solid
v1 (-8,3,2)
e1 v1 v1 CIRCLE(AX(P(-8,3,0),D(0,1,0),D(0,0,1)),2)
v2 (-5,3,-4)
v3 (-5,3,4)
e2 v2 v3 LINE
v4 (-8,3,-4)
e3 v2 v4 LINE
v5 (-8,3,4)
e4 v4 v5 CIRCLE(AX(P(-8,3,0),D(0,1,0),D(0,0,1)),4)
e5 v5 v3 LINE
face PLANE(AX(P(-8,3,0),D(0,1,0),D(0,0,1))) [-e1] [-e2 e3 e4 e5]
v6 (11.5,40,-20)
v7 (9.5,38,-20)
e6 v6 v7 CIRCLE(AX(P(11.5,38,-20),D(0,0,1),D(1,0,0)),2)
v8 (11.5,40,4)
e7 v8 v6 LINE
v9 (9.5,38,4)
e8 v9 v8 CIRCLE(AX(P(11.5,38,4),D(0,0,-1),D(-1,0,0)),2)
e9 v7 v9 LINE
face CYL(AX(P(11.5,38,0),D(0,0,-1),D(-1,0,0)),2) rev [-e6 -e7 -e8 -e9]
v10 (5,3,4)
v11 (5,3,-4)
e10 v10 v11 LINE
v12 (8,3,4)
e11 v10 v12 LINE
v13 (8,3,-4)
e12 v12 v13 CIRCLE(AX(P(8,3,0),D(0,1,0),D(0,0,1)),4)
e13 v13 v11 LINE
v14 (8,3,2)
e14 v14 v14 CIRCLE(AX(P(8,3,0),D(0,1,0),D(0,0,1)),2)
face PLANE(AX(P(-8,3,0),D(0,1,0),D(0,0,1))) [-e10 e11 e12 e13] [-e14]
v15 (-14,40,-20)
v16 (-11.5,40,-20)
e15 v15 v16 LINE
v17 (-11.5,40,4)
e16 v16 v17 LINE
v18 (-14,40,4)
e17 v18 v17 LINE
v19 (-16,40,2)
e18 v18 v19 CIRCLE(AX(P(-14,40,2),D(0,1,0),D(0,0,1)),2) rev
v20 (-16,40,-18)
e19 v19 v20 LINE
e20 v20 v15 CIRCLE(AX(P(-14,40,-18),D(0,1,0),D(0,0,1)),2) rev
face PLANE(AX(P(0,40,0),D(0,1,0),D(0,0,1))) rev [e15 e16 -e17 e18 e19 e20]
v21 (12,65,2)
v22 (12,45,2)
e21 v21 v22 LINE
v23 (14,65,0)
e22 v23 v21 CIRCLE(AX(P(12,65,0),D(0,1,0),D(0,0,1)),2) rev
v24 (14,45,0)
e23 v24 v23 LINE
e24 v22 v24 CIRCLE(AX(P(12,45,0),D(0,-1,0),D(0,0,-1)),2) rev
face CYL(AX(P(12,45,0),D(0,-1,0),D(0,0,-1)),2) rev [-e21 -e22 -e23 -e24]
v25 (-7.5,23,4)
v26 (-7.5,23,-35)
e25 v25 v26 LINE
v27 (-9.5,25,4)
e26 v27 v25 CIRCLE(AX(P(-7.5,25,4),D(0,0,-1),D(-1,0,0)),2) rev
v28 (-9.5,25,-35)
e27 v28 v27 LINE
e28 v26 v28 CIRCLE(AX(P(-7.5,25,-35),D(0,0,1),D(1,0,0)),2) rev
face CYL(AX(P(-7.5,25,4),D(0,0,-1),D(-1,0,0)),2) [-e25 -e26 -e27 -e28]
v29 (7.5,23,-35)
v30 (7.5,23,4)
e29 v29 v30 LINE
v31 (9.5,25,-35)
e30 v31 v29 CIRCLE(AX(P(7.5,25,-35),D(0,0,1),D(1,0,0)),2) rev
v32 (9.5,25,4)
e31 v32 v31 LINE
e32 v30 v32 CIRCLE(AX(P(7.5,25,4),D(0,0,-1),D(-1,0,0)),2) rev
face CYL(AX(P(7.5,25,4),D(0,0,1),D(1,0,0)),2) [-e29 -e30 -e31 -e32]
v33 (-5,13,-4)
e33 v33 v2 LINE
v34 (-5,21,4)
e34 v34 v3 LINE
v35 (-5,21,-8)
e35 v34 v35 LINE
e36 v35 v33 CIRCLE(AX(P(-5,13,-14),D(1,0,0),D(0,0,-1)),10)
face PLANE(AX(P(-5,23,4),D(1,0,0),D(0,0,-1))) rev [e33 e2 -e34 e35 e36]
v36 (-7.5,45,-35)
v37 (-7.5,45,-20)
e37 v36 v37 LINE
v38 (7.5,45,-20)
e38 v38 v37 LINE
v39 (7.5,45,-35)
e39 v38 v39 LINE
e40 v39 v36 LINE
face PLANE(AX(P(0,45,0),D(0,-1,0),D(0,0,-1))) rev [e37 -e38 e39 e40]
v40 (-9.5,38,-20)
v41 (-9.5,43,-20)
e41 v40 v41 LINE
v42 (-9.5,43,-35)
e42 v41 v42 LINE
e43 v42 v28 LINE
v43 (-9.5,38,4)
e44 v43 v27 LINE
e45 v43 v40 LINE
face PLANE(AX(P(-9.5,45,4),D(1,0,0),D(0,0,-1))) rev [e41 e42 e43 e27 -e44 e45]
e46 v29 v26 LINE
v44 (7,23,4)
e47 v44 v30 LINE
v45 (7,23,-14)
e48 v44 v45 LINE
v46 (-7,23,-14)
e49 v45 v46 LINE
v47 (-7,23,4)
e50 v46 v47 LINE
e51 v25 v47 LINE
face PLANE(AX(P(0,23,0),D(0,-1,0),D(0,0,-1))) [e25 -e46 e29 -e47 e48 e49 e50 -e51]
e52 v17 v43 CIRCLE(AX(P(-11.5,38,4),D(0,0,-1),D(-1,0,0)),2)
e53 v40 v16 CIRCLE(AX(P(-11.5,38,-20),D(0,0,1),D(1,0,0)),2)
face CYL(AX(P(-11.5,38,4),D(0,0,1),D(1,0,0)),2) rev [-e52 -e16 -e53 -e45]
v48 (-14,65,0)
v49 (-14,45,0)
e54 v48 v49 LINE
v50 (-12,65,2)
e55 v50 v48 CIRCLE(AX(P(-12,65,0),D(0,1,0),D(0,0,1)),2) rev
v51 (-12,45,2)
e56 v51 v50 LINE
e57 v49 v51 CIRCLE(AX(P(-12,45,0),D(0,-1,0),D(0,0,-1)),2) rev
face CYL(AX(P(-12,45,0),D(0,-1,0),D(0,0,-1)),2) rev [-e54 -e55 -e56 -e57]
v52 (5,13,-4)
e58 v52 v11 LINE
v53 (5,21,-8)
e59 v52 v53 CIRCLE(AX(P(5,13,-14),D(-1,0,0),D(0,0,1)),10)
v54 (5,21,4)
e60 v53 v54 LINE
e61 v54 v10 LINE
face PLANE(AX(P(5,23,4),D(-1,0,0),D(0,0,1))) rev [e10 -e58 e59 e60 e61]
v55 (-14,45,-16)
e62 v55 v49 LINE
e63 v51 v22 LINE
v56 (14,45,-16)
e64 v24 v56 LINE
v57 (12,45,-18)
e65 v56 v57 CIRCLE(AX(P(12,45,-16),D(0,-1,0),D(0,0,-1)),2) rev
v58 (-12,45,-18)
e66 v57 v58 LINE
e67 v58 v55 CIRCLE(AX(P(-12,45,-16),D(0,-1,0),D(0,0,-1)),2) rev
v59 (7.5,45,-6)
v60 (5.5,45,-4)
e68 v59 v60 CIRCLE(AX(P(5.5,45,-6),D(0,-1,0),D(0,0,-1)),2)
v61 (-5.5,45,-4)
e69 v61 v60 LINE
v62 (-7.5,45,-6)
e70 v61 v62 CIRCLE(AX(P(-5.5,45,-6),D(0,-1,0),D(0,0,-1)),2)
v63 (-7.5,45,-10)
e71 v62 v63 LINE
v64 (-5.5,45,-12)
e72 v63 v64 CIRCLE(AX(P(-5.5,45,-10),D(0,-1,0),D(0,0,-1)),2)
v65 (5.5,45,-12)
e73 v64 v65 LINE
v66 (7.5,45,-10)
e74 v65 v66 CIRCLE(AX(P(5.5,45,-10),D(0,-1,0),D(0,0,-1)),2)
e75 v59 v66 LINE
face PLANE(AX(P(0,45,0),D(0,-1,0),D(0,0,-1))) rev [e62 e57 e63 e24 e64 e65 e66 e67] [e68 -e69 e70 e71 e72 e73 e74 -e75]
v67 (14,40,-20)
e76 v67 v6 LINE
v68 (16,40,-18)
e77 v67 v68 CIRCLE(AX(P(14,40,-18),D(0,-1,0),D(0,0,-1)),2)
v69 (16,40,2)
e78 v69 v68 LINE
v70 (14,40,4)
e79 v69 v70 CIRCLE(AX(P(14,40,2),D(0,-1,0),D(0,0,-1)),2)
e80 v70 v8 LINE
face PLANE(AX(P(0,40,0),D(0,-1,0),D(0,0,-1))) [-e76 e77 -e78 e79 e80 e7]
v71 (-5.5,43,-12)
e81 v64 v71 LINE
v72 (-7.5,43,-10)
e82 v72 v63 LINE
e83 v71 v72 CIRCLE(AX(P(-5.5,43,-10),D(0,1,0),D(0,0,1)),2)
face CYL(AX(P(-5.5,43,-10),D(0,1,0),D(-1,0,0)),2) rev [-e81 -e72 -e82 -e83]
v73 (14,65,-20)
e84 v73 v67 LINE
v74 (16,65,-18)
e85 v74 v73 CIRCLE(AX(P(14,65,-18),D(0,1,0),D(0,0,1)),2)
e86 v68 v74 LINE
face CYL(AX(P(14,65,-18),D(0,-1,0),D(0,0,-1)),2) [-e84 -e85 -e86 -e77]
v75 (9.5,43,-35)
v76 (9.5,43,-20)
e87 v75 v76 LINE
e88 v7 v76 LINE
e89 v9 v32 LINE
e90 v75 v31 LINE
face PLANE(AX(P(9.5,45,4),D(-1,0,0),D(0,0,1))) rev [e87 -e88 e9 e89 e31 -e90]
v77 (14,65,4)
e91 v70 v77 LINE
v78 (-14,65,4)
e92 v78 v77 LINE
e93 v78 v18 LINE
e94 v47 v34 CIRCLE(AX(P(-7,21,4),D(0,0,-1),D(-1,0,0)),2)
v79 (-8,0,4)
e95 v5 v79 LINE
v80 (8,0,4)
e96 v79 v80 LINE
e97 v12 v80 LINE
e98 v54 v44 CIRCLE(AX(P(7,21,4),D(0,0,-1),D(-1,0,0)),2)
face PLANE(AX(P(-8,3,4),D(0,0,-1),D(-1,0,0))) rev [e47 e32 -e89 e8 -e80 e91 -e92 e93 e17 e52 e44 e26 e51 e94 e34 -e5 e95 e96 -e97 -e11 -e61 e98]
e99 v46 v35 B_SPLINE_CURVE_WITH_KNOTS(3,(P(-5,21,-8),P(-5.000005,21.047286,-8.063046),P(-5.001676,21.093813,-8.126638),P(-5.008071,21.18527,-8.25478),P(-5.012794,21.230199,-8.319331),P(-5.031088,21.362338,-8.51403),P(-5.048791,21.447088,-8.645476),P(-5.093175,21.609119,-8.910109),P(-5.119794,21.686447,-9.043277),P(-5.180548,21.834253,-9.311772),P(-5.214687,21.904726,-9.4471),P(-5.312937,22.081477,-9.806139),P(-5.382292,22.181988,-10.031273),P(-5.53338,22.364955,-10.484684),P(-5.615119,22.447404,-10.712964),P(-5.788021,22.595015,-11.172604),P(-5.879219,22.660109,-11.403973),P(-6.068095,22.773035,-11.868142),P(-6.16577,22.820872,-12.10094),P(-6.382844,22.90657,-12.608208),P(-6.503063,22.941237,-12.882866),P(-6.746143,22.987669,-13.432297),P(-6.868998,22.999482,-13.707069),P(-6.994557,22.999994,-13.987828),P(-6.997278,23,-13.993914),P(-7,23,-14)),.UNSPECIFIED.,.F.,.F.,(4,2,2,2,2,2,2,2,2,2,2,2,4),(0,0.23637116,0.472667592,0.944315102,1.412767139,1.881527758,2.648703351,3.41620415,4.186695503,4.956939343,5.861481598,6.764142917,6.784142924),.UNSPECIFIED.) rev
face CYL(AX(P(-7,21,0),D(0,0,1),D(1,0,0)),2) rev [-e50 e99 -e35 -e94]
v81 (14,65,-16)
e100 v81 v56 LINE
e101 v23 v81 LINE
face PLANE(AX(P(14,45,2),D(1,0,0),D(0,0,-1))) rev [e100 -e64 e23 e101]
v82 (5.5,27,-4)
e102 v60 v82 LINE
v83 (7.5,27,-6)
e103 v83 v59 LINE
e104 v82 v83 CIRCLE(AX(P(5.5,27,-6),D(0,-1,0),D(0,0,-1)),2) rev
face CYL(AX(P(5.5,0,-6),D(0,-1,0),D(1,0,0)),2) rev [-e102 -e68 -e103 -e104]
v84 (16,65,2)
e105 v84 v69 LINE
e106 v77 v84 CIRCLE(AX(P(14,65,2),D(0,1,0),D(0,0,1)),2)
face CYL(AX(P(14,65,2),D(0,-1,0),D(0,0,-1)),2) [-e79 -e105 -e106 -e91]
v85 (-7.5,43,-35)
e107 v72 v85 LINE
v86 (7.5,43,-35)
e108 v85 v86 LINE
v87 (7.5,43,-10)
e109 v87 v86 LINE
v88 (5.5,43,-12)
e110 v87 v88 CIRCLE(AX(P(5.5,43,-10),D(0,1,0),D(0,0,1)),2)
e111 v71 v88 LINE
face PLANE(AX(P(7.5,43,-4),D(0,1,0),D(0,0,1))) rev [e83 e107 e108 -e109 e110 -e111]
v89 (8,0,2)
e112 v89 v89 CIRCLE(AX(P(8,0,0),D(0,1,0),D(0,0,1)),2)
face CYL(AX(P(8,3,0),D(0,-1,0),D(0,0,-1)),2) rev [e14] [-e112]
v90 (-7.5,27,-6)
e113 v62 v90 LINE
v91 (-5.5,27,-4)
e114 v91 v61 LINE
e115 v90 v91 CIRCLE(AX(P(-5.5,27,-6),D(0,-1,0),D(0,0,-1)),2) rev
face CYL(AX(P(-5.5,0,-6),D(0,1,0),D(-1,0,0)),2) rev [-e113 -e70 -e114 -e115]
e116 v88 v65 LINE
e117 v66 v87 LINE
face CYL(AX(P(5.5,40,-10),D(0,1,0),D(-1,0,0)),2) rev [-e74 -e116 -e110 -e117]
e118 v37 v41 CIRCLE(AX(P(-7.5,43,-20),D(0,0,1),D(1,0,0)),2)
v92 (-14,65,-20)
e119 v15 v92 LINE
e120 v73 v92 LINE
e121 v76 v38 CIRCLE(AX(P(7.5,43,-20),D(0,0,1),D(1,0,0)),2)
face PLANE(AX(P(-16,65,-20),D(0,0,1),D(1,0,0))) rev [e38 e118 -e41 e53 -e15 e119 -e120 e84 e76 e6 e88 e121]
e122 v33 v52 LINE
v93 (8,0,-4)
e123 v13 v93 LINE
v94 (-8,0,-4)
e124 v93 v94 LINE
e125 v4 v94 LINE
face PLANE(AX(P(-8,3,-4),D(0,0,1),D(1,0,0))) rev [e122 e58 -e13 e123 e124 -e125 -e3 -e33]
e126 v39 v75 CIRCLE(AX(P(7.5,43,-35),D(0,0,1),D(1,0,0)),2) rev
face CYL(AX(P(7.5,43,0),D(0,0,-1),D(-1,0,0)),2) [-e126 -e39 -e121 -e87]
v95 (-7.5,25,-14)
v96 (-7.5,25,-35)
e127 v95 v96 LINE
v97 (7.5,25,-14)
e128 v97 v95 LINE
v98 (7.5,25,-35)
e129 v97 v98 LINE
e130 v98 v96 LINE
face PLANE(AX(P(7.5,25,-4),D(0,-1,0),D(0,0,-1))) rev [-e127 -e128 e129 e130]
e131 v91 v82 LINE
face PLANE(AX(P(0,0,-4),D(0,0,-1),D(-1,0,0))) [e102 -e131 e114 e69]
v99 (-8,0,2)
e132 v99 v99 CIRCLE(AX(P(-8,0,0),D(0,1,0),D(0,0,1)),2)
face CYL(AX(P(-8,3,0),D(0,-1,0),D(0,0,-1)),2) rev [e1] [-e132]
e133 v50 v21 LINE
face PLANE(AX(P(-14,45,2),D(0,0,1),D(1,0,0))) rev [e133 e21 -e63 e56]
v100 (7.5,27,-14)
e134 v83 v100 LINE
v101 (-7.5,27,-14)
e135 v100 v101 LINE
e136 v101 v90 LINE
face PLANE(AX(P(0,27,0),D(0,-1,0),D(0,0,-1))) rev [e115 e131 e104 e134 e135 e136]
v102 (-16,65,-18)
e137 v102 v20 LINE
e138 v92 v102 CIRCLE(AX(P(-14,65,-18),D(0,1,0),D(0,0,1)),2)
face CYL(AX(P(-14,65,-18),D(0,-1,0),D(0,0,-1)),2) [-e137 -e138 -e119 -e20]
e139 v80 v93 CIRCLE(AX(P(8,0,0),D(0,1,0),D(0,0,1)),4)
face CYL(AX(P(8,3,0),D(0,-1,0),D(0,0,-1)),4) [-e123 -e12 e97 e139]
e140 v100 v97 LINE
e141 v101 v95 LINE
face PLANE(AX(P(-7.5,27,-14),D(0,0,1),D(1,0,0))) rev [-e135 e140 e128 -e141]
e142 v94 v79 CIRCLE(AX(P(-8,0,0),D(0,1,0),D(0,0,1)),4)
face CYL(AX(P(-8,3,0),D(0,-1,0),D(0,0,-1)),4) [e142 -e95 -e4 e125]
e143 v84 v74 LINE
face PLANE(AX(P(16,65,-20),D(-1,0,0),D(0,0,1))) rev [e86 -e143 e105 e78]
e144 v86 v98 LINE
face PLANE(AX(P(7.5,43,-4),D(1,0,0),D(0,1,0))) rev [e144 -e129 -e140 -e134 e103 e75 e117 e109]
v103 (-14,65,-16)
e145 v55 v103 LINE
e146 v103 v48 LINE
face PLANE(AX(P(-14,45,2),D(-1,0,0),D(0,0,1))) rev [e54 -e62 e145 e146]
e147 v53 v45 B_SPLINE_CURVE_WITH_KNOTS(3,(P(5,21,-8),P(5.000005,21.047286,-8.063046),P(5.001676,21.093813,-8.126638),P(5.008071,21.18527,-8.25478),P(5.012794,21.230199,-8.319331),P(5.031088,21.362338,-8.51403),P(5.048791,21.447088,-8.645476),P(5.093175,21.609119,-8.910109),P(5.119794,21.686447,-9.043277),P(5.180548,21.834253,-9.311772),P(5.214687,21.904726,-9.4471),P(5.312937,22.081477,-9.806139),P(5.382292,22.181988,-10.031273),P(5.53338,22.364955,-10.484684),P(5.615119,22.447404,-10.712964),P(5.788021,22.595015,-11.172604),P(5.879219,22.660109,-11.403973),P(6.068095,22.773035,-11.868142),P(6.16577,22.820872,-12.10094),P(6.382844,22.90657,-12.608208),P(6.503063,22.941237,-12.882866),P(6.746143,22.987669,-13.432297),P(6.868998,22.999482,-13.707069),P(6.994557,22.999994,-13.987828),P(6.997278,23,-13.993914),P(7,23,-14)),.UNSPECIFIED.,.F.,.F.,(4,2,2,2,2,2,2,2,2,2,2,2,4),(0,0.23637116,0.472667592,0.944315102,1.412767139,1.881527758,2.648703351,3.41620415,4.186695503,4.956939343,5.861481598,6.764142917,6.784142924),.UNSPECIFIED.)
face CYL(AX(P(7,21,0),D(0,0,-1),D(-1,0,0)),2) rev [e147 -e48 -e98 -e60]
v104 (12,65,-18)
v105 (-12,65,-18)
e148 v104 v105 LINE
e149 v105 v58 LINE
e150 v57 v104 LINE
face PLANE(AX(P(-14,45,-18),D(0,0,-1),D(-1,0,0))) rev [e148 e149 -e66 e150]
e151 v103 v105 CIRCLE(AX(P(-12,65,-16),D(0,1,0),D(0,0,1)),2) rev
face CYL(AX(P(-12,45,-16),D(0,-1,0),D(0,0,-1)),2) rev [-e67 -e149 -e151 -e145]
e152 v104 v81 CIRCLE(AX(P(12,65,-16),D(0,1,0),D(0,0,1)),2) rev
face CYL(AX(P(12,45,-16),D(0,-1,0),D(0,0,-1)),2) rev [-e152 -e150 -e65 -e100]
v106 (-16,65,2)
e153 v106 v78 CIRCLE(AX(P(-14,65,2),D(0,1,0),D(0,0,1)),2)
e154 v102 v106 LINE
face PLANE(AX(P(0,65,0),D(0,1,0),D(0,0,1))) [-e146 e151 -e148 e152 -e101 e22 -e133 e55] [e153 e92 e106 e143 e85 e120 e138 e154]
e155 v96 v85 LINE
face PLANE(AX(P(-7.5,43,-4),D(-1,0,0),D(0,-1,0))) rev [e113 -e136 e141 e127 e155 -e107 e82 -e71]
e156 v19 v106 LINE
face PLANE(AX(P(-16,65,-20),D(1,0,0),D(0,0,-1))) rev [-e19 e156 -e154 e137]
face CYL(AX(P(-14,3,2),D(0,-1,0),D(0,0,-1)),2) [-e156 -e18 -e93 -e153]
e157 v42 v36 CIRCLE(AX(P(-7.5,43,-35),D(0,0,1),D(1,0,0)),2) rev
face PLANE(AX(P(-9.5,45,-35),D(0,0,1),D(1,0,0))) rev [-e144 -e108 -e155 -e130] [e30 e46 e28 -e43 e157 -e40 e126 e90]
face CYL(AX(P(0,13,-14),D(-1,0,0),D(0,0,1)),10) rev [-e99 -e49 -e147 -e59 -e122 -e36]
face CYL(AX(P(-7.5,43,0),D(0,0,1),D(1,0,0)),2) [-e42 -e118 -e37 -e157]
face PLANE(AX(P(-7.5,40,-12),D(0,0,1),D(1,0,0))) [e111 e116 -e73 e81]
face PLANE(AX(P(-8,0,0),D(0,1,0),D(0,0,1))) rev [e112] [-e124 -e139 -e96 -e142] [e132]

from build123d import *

# Parameters (mm, degrees)
SKETCH_1_R          = 2
EXTRUDE_1_DEPTH     = 3
SKETCH_2_W          = 10
SKETCH_2_H          = 8
EXTRUDE_2_DEPTH     = 20
SKETCH_3_W          = 19
SKETCH_3_H          = 39
EXTRUDE_3_DEPTH     = 22
SKETCH_4_W          = 15
SKETCH_4_H          = 18
CUT_EXTRUDE_1_DEPTH = 31
SKETCH_5_W          = 15
SKETCH_5_H          = 8
CUT_EXTRUDE_2_DEPTH = 5
SKETCH_6_W          = 32
SKETCH_6_H          = 24
EXTRUDE_5_DEPTH     = 20
SKETCH_7_W          = 28
SKETCH_7_H          = 20
CUT_EXTRUDE_3_DEPTH = 20
SKETCH_8_W          = 6.5
SKETCH_8_H          = 24
EXTRUDE_6_DEPTH     = 5
SKETCH_9_W          = 15
SKETCH_9_H          = 10
EXTRUDE_7_DEPTH     = 2
FILLET_1_R          = 2
FILLET_2_R          = 2
FILLET_3_R          = 2
FILLET_4_R          = 2
FILLET_5_R          = 2
FILLET_6_R          = 2
FILLET_7_R          = 2
FILLET_8_R          = 2
FILLET_9_R          = 2
FILLET_10_R         = 2
FILLET_11_R         = 2
FILLET_12_R         = 2
FILLET_13_R         = 2
FILLET_14_R         = 2
FILLET_15_R         = 2
FILLET_16_R         = 2
FILLET_17_R         = 2
FILLET_18_R         = 2
FILLET_19_R         = 2
FILLET_20_R         = 2
FILLET_START        = -5
FILLET_21_DEPTH     = 10
FILLET_START_2      = -14
FILLET_21_2_DEPTH   = 10
FILLET_START_3      = -8
FILLET_21_3_DEPTH   = 16


with BuildPart() as part:
    # 草图1 → 凸台-拉伸1 (new body)
    with BuildSketch(Plane(origin=(0, 0, 0), x_dir=(1, 0, 0), z_dir=(0, 1, 0))):
        with BuildLine():
            Line((-8, 4), (8, 4))
            ThreePointArc((8, 4), (12, 0), (8, -4))
            Line((8, -4), (-8, -4))
            ThreePointArc((-8, -4), (-12, 0), (-8, 4))
        make_face()
        with Locations(Location((8, 0, 0), (0, 0, 270))):
            Circle(SKETCH_1_R, mode=Mode.SUBTRACT)
        with Locations(Location((-8, 0, 0), (0, 0, 270))):
            Circle(SKETCH_1_R, mode=Mode.SUBTRACT)
    extrude(amount=EXTRUDE_1_DEPTH)

    # 草图2 → 凸台-拉伸2 (add)
    with BuildSketch(Plane(origin=(0, 3, 0), x_dir=(1, 0, 0), z_dir=(0, 1, 0))):
        Rectangle(SKETCH_2_W, SKETCH_2_H)
    extrude(amount=EXTRUDE_2_DEPTH)

    # 草图3 → 凸台-拉伸3 (add)
    with BuildSketch(Plane(origin=(0, 23, 0), x_dir=(1, 0, 0), z_dir=(0, 1, 0))):
        with Locations((0, 15.5)):
            Rectangle(SKETCH_3_W, SKETCH_3_H)
    extrude(amount=EXTRUDE_3_DEPTH)

    # 草图4 → 切除-拉伸1 (cut)
    with BuildSketch(Plane(origin=(0, 0, -35), x_dir=(-1, 0, 0), z_dir=(0, 0, -1))):
        with Locations((0, 34)):
            Rectangle(SKETCH_4_W, SKETCH_4_H)
    extrude(amount=-CUT_EXTRUDE_1_DEPTH, mode=Mode.SUBTRACT)

    # 草图5 → 切除-拉伸2 (cut)
    with BuildSketch(Plane(origin=(0, 45, 0), x_dir=(1, 0, 0), z_dir=(0, 1, 0))):
        with Locations((0, 8)):
            Rectangle(SKETCH_5_W, SKETCH_5_H)
    extrude(amount=-CUT_EXTRUDE_2_DEPTH, mode=Mode.SUBTRACT)

    # 草图6 → 凸台-拉伸5 (add)
    with BuildSketch(Plane(origin=(0, 45, 0), x_dir=(1, 0, 0), z_dir=(0, 1, 0))):
        with Locations((0, 8)):
            Rectangle(SKETCH_6_W, SKETCH_6_H)
    extrude(amount=EXTRUDE_5_DEPTH)

    # 草图7 → 切除-拉伸3 (cut)
    with BuildSketch(Plane(origin=(0, 65, 0), x_dir=(1, 0, 0), z_dir=(0, 1, 0))):
        with Locations((0, 8)):
            Rectangle(SKETCH_7_W, SKETCH_7_H)
    extrude(amount=-CUT_EXTRUDE_3_DEPTH, mode=Mode.SUBTRACT)

    # 草图8 → 凸台-拉伸6 (add)
    with BuildSketch(Plane(origin=(0, 45, 0), x_dir=(1, 0, 0), z_dir=(0, 1, 0))):
        Polygon((-16, 20), (-16, -4), (-9.5, -4), (-9.5, -2), (-9.5, 18), (-9.5, 20), align=None)
        with Locations((12.75, 8)):
            Rectangle(SKETCH_8_W, SKETCH_8_H)
    extrude(amount=-EXTRUDE_6_DEPTH)

    # 草图9 → 凸台-拉伸7 (add)
    with BuildSketch(Plane(origin=(0, 25, 0), x_dir=(1, 0, 0), z_dir=(0, 1, 0))):
        with Locations((0, 9)):
            Rectangle(SKETCH_9_W, SKETCH_9_H)
    extrude(amount=EXTRUDE_7_DEPTH)

    # 圆角1
    fillet_1_edges = [part.edges().sort_by_distance(p)[0] for p in [
        (16, 52.5, -20),
    ]]
    fillet(fillet_1_edges, radius=FILLET_1_R)

    # 圆角2
    fillet_2_edges = [part.edges().sort_by_distance(p)[0] for p in [
        (-16, 52.5, -20),
    ]]
    fillet(fillet_2_edges, radius=FILLET_2_R)

    # 圆角3
    fillet_3_edges = [part.edges().sort_by_distance(p)[0] for p in [
        (-16, 52.5, 4),
    ]]
    fillet(fillet_3_edges, radius=FILLET_3_R)

    # 圆角4
    fillet_4_edges = [part.edges().sort_by_distance(p)[0] for p in [
        (16, 52.5, 4),
    ]]
    fillet(fillet_4_edges, radius=FILLET_4_R)

    # 圆角5
    fillet_5_edges = [part.edges().sort_by_distance(p)[0] for p in [
        (14, 55, 2),
    ]]
    fillet(fillet_5_edges, radius=FILLET_5_R)

    # 圆角6
    fillet_6_edges = [part.edges().sort_by_distance(p)[0] for p in [
        (-14, 55, 2),
    ]]
    fillet(fillet_6_edges, radius=FILLET_6_R)

    # 圆角7
    fillet_7_edges = [part.edges().sort_by_distance(p)[0] for p in [
        (-14, 55, -18),
    ]]
    fillet(fillet_7_edges, radius=FILLET_7_R)

    # 圆角8
    fillet_8_edges = [part.edges().sort_by_distance(p)[0] for p in [
        (14, 55, -18),
    ]]
    fillet(fillet_8_edges, radius=FILLET_8_R)

    # 圆角9
    fillet_9_edges = [part.edges().sort_by_distance(p)[0] for p in [
        (-7.5, 36, -4),
    ]]
    fillet(fillet_9_edges, radius=FILLET_9_R)

    # 圆角10
    fillet_10_edges = [part.edges().sort_by_distance(p)[0] for p in [
        (7.5, 36, -4),
    ]]
    fillet(fillet_10_edges, radius=FILLET_10_R)

    # 圆角11
    fillet_11_edges = [part.edges().sort_by_distance(p)[0] for p in [
        (7.5, 44, -12),
    ]]
    fillet(fillet_11_edges, radius=FILLET_11_R)

    # 圆角12
    fillet_12_edges = [part.edges().sort_by_distance(p)[0] for p in [
        (-7.5, 44, -12),
    ]]
    fillet(fillet_12_edges, radius=FILLET_12_R)

    # 圆角13
    fillet_13_edges = [part.edges().sort_by_distance(p)[0] for p in [
        (-9.5, 45, -27.5),
    ]]
    fillet(fillet_13_edges, radius=FILLET_13_R)

    # 圆角14
    fillet_14_edges = [part.edges().sort_by_distance(p)[0] for p in [
        (9.5, 45, -27.5),
    ]]
    fillet(fillet_14_edges, radius=FILLET_14_R)

    # 圆角15
    fillet_15_edges = [part.edges().sort_by_distance(p)[0] for p in [
        (9.5, 23, -15.5),
    ]]
    fillet(fillet_15_edges, radius=FILLET_15_R)

    # 圆角16
    fillet_16_edges = [part.edges().sort_by_distance(p)[0] for p in [
        (-9.5, 23, -15.5),
    ]]
    fillet(fillet_16_edges, radius=FILLET_16_R)

    # 圆角17
    fillet_17_edges = [part.edges().sort_by_distance(p)[0] for p in [
        (9.5, 40, -8),
    ]]
    fillet(fillet_17_edges, radius=FILLET_17_R)

    # 圆角18
    fillet_18_edges = [part.edges().sort_by_distance(p)[0] for p in [
        (-9.5, 40, -8),
    ]]
    fillet(fillet_18_edges, radius=FILLET_18_R)

    # 圆角19
    fillet_19_edges = [part.edges().sort_by_distance(p)[0] for p in [
        (5, 23, 0),
    ]]
    fillet(fillet_19_edges, radius=FILLET_19_R)

    # 圆角20
    fillet_20_edges = [part.edges().sort_by_distance(p)[0] for p in [
        (-5, 23, 0),
    ]]
    fillet(fillet_20_edges, radius=FILLET_20_R)

    # 圆角21: read off the stored shape, not the designer's step
    # 圆角21 outline → 圆角21 (add)
    with BuildSketch(Plane.YZ.offset(FILLET_START)):
        with BuildLine():
            Line((23, -4), (13, -4))
            ThreePointArc((13, -4), (20.071068, -6.928932), (23, -14))
            Line((23, -14), (23, -4))
        make_face()
    extrude(amount=FILLET_21_DEPTH)

    # Fillet 21 2 outline → Fillet 21 2 (add)
    with BuildSketch(Plane.XY.offset(FILLET_START_2)):
        with BuildLine():
            Line((5, 23), (5, 21))
            ThreePointArc((5, 21), (5.585786, 22.414214), (7, 23))
            Line((7, 23), (5, 23))
        make_face()
        with BuildLine():
            Line((-5, 21), (-5, 23))
            Line((-5, 23), (-7, 23))
            ThreePointArc((-7, 23), (-5.585786, 22.414214), (-5, 21))
        make_face()
    extrude(amount=FILLET_21_2_DEPTH)

    # Fillet 21 3 outline → Fillet 21 3 (cut)
    with BuildSketch(Plane.YZ.offset(FILLET_START_3)):
        with BuildLine():
            Line((21, -14), (23, -14))
            ThreePointArc((23, -14), (22.486833, -10.837722), (21, -8))
            Line((21, -8), (21, -14))
        make_face()
    extrude(amount=FILLET_21_3_DEPTH, mode=Mode.SUBTRACT)


solid = part.part
